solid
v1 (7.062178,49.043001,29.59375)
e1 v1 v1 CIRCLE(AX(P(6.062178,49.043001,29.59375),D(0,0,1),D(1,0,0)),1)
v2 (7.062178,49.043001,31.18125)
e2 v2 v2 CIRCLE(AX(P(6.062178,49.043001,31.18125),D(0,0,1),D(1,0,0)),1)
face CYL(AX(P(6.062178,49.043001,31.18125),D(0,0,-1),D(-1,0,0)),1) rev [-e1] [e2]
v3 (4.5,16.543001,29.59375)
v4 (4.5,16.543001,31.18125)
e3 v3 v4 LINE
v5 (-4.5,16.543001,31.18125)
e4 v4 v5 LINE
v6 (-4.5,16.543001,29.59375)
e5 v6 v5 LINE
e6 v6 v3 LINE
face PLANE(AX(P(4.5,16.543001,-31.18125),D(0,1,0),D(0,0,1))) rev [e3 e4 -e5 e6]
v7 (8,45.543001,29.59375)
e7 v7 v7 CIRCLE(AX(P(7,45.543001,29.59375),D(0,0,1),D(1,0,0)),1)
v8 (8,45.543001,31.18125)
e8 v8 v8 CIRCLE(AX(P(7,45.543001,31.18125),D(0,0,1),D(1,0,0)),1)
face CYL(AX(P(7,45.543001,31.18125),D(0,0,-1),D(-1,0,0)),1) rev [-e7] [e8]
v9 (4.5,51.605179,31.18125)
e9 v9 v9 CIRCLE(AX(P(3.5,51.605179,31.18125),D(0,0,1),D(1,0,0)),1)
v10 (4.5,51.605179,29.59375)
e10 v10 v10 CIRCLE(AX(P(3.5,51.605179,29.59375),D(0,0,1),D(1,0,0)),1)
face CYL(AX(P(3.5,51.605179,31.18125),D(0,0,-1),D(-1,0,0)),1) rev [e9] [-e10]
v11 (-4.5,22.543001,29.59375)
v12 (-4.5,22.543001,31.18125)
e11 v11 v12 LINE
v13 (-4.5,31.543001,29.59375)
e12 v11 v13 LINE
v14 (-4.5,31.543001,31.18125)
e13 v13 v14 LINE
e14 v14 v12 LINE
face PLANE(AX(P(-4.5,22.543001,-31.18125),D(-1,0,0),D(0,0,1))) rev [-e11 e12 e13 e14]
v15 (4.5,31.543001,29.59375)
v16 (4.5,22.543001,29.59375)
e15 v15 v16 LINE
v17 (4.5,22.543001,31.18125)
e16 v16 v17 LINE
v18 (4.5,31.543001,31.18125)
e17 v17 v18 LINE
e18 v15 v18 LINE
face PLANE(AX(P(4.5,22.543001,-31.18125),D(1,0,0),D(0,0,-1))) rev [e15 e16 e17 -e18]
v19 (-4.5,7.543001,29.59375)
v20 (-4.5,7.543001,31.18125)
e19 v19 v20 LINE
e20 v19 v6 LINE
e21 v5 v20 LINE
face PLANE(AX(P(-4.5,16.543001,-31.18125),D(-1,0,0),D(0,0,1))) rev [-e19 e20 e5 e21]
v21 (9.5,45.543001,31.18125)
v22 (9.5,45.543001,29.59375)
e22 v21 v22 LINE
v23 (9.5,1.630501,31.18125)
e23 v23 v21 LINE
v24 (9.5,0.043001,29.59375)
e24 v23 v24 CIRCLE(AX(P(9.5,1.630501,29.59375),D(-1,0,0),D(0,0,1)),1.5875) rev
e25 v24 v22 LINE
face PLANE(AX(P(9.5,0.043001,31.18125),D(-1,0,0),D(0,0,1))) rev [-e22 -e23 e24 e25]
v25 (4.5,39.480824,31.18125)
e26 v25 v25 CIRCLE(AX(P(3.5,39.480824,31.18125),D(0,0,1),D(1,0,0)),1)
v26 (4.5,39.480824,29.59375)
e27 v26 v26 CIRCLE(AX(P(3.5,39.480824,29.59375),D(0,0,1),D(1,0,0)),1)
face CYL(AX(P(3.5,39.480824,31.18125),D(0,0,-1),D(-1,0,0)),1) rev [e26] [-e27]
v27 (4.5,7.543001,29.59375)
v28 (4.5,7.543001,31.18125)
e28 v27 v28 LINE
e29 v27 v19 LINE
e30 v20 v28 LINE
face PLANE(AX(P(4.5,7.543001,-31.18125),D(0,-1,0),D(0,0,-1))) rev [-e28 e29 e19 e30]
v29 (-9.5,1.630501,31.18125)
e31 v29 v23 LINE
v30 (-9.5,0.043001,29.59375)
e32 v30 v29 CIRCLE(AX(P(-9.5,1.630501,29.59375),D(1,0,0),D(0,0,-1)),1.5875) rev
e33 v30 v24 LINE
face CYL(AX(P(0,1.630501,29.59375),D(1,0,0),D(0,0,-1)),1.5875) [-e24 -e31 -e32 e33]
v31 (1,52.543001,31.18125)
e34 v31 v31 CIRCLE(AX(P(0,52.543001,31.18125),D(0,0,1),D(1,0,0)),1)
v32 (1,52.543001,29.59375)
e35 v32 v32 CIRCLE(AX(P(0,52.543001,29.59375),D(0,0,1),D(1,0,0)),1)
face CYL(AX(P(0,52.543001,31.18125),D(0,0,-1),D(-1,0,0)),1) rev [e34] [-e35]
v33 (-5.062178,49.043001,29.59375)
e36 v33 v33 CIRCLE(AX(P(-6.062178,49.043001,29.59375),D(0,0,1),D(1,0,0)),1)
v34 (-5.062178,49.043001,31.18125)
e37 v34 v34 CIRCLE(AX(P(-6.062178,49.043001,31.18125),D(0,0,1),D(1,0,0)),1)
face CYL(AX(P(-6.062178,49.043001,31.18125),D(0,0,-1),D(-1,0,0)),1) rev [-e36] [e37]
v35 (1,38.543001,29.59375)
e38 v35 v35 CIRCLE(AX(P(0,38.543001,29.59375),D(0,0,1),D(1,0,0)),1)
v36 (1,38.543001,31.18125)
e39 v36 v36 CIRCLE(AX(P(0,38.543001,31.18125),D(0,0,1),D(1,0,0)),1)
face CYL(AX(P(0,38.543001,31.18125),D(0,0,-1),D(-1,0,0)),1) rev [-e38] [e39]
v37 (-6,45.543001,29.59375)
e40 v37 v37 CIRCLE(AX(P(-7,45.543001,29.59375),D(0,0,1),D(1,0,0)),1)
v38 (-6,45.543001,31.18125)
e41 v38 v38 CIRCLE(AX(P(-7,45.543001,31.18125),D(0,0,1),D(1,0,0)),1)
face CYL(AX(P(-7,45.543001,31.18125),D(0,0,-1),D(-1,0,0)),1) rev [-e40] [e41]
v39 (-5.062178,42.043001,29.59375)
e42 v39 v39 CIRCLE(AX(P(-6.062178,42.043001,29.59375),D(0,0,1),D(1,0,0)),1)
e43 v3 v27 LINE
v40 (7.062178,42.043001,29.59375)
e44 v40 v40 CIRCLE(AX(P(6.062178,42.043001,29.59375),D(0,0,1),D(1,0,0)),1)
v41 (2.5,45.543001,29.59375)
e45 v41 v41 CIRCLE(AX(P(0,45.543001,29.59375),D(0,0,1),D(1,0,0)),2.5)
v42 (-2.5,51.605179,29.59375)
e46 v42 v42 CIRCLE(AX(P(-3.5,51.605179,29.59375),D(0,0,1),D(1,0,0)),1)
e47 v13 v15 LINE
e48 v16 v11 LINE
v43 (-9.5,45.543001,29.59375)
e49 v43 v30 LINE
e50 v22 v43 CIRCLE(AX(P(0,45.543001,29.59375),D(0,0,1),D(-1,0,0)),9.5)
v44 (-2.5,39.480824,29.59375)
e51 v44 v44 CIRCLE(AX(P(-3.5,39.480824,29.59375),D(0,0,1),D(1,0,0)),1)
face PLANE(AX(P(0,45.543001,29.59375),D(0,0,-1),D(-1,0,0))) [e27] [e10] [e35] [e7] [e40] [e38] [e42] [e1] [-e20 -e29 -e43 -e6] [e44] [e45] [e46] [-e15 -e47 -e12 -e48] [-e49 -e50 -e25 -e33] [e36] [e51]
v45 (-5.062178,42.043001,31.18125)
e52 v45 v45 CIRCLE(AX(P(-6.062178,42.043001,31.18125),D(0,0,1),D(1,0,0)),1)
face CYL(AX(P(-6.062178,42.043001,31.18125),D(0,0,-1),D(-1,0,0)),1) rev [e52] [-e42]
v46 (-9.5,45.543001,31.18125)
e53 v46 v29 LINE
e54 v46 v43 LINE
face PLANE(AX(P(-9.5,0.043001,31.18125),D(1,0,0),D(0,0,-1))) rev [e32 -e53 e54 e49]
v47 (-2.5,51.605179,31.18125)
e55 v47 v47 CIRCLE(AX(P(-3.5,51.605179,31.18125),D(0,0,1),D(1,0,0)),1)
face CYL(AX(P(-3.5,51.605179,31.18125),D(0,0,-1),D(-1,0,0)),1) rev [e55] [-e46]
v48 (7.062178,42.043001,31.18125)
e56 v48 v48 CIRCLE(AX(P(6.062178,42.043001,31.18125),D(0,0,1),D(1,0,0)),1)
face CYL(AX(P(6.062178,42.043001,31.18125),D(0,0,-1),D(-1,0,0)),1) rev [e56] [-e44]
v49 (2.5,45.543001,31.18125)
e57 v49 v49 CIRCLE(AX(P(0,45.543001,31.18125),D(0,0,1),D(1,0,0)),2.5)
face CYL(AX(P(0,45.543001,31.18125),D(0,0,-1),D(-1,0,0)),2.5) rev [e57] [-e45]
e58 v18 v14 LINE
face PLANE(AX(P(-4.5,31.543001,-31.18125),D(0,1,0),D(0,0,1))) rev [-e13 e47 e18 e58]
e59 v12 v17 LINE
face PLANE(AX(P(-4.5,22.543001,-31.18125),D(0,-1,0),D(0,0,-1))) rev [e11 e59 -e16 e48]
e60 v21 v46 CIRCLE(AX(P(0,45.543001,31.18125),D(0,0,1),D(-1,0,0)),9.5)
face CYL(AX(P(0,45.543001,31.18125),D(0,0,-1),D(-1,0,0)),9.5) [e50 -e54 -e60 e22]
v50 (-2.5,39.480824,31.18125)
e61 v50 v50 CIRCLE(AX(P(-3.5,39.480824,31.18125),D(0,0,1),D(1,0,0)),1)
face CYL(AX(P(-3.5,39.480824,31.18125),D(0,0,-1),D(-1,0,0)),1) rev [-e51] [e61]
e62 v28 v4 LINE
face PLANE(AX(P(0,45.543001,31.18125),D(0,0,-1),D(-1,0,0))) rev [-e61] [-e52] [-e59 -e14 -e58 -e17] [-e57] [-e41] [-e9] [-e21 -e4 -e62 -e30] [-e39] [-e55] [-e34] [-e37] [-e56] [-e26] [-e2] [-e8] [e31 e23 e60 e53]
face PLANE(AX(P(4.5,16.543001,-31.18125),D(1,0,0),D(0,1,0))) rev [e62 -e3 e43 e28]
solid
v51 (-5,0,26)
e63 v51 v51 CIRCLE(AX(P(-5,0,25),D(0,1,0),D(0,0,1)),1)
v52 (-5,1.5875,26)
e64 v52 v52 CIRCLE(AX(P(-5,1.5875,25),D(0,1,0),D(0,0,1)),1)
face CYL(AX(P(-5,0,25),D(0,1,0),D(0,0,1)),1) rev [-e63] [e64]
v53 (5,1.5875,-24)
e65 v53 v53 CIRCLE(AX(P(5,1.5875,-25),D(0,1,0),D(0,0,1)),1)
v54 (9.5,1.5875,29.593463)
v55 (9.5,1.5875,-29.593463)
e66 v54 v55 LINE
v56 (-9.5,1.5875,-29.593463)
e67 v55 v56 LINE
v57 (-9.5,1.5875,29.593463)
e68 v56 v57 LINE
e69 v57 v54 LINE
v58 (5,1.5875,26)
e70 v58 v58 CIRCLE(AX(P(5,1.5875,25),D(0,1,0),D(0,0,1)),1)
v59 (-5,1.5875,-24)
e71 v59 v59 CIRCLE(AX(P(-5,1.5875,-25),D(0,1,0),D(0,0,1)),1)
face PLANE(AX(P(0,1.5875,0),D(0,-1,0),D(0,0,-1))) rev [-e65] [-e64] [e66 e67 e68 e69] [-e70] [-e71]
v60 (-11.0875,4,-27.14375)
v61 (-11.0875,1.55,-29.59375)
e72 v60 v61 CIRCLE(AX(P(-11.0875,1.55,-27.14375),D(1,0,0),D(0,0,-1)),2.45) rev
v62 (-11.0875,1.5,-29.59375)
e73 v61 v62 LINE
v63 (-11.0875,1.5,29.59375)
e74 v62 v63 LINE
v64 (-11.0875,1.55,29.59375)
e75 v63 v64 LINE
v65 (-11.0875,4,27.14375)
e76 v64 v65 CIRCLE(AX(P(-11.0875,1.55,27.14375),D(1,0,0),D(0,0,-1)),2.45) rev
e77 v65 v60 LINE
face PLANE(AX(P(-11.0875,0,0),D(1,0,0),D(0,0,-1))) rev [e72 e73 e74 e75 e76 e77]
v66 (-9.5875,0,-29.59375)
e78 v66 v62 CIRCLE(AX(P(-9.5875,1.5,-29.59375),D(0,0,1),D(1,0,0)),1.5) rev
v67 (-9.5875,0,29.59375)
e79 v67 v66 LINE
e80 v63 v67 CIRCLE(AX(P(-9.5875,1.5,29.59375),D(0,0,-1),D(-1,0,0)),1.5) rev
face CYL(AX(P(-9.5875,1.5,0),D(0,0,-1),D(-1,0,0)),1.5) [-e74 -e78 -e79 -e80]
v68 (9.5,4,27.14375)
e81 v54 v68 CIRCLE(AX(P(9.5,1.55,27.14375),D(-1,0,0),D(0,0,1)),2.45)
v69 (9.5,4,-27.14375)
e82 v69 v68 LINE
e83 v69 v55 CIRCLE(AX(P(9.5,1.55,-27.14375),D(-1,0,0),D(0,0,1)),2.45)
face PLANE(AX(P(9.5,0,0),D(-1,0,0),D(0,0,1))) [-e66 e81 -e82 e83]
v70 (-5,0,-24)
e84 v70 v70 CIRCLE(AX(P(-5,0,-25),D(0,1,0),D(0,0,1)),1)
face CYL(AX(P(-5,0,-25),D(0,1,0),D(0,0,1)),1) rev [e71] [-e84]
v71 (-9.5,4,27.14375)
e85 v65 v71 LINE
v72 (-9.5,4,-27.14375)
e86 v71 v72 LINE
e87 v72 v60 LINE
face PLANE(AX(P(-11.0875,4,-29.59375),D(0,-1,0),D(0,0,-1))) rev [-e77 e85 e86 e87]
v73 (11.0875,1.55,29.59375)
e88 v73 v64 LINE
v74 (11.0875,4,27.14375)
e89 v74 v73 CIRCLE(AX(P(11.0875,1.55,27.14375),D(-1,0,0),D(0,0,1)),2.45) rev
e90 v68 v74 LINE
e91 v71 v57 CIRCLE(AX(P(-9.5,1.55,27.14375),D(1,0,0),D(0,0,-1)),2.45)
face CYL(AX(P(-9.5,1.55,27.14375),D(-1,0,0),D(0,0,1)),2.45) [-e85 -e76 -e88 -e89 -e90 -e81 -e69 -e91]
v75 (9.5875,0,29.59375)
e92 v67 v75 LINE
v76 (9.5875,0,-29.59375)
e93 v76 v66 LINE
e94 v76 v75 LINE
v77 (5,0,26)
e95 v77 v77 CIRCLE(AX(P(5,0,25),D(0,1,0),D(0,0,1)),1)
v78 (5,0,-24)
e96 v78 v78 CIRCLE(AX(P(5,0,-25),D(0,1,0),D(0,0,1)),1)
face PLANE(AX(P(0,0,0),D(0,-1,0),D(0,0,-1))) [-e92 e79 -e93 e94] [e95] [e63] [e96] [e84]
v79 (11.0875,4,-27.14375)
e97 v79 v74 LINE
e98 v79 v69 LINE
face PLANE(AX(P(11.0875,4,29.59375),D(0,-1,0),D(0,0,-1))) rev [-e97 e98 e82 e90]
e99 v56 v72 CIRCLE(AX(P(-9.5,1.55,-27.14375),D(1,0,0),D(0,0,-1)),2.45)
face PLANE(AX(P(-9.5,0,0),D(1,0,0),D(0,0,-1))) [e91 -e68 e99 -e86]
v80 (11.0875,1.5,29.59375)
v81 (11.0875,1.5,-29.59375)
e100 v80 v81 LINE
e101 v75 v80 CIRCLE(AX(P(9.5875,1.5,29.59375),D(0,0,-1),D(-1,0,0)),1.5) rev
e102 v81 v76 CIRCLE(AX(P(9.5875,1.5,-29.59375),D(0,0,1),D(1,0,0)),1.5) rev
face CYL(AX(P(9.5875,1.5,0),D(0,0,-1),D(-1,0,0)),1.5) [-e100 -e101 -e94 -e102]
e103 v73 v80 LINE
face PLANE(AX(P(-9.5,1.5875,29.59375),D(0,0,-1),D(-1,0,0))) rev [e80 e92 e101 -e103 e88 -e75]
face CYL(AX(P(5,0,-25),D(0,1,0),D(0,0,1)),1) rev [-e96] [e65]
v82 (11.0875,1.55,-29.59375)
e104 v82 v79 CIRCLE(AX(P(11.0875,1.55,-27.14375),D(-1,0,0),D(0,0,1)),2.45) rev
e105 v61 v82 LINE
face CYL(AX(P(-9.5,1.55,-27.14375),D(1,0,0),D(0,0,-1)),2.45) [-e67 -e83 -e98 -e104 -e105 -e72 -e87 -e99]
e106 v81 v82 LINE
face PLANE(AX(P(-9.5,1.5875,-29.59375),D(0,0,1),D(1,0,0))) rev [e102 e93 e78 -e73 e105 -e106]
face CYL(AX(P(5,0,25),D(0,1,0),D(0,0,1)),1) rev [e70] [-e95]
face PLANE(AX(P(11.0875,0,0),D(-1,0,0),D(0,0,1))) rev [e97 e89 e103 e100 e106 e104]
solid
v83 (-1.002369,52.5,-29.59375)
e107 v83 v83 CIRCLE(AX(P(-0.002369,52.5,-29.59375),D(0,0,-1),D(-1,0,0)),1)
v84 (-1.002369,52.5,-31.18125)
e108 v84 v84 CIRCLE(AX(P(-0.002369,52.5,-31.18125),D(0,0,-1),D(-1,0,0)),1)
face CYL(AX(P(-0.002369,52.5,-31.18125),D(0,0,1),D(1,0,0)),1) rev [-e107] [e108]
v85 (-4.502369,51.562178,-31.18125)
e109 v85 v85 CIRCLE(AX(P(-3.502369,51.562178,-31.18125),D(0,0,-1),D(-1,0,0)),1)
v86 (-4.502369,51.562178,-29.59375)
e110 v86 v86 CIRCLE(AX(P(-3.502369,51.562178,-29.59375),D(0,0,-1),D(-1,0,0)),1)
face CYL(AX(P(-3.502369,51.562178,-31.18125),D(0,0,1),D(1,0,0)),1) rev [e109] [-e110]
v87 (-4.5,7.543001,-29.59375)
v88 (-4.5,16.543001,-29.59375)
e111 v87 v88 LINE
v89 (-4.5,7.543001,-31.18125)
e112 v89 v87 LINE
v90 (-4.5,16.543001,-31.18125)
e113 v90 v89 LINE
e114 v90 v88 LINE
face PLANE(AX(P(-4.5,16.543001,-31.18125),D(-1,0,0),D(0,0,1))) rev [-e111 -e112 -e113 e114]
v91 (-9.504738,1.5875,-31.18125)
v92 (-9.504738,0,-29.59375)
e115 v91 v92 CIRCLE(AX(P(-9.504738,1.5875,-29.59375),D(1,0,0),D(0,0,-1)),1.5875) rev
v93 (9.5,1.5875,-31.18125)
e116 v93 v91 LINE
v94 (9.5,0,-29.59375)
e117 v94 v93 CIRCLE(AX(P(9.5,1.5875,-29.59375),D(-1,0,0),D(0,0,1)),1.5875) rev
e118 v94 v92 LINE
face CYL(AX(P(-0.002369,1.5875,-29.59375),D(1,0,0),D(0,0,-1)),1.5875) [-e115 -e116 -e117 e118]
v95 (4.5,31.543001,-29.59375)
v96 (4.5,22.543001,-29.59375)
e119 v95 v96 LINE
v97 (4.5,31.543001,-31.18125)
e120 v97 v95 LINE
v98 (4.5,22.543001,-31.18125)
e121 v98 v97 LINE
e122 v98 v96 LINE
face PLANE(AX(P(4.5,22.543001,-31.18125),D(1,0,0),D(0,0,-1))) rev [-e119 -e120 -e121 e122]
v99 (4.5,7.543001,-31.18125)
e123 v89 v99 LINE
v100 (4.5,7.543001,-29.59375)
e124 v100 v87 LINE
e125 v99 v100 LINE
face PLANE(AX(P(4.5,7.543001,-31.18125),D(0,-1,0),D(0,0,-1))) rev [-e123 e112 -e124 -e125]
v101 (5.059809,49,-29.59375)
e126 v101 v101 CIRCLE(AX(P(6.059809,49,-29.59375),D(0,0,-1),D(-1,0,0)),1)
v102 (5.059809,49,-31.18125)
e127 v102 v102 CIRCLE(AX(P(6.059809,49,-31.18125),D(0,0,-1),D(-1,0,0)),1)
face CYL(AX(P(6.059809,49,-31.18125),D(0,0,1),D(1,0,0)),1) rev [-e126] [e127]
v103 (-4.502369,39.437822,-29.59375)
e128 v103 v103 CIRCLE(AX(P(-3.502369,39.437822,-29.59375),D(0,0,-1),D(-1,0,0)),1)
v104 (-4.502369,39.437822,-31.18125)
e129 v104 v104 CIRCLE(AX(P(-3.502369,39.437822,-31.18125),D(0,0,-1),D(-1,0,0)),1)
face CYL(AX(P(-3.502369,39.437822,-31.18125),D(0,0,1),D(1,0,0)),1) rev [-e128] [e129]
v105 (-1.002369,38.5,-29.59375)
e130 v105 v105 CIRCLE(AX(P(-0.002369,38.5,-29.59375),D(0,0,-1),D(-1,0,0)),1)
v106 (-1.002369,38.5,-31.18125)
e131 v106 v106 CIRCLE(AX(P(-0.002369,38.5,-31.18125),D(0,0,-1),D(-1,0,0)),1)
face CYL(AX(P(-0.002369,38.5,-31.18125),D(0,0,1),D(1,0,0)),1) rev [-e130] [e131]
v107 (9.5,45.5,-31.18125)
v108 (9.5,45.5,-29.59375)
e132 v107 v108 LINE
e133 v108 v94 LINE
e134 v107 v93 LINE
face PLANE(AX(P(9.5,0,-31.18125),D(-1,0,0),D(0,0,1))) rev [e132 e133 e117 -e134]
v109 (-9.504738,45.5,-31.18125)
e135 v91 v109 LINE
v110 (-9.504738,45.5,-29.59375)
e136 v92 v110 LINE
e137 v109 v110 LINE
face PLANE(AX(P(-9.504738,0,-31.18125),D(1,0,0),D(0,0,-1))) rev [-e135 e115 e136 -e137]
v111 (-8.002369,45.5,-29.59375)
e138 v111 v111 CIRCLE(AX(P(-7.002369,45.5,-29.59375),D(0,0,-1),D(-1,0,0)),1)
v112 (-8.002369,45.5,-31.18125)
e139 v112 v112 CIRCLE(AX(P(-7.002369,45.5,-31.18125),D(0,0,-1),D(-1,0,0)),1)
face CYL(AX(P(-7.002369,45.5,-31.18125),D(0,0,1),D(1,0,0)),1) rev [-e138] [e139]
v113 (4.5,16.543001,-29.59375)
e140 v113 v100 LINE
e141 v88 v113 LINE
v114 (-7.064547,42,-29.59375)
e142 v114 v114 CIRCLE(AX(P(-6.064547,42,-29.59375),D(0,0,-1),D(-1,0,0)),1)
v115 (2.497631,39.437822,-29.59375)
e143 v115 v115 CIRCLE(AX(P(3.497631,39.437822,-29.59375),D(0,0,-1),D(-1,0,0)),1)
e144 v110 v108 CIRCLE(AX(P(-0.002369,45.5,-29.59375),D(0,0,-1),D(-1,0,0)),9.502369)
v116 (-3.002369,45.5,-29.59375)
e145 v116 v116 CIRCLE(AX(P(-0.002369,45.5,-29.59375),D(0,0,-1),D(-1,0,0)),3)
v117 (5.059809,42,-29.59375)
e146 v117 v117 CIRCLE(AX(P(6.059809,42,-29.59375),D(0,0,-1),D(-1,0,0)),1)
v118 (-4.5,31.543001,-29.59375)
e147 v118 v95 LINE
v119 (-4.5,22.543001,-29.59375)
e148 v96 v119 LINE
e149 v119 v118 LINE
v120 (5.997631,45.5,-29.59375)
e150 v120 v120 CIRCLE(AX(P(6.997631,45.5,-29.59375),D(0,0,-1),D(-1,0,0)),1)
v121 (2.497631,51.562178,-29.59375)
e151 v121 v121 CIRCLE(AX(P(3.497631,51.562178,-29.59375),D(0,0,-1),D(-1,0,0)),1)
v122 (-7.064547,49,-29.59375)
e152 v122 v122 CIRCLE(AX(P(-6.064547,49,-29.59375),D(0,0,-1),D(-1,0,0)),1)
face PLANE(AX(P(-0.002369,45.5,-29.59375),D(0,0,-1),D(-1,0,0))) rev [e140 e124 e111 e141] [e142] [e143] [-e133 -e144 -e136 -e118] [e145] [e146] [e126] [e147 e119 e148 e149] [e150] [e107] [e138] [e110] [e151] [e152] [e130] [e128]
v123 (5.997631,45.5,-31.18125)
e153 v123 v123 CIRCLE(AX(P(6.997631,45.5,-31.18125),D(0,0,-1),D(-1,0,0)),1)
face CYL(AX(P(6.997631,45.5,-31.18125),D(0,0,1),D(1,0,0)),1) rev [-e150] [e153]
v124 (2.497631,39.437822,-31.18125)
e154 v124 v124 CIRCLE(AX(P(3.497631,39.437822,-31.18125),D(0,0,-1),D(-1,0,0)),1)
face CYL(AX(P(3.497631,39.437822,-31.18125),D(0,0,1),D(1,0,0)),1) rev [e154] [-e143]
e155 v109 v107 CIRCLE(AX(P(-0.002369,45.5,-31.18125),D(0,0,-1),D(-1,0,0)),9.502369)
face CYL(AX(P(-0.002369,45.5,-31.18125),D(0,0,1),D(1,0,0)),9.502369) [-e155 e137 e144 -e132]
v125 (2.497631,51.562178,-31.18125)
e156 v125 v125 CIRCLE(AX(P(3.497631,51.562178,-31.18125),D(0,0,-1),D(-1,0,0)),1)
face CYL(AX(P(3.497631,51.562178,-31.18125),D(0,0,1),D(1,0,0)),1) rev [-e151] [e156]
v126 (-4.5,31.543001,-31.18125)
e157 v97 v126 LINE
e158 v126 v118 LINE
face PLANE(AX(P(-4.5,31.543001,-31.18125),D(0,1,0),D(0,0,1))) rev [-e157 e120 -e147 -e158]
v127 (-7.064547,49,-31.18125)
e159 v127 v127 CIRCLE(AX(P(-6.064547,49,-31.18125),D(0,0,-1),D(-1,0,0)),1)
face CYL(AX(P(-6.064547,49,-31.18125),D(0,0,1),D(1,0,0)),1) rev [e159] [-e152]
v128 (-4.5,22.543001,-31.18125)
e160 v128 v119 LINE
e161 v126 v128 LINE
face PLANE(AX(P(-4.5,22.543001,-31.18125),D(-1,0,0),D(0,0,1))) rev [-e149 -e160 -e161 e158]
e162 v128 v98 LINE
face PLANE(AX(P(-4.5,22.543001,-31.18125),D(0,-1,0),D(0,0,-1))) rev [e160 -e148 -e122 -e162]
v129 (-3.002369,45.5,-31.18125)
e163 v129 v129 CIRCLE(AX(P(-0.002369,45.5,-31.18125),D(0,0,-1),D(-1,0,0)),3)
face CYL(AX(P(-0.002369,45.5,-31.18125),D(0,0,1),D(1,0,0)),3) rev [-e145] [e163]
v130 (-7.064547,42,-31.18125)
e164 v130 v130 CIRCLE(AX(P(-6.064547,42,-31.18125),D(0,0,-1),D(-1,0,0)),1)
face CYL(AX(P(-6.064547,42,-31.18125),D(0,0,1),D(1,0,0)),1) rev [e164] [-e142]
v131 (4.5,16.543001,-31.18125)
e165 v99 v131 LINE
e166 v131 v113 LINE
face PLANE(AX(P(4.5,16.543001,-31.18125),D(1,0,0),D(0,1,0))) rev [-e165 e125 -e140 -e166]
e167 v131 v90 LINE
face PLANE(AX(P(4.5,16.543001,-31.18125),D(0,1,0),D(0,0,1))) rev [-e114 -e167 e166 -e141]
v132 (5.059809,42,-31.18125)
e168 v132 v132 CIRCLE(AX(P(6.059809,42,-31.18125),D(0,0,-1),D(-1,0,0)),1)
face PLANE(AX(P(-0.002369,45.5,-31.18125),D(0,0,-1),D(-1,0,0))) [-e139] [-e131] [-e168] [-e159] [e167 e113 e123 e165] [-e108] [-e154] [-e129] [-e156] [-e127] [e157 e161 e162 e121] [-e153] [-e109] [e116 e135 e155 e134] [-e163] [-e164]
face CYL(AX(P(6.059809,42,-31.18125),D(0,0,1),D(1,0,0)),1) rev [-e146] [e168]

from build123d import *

# Parameters (mm, degrees)
ESQUISSE1_W             = 19
ESQUISSE1_H             = 59.1875
BOSS_EXTRU_1_DEPTH      = 1.5875
ESQUISSE3_W             = 59.1875
ESQUISSE3_H             = 4
BOSS_EXTRU_2_DEPTH      = 1.5875
ESQUISSE4_W             = 59.1875
ESQUISSE4_H             = 4
BOSS_EXTRU_3_DEPTH      = 1.5875
CONG_1_R                = 1.5
CONG_2_R                = 1.5
ESQUISSE5_R             = 2.5
ESQUISSE5_R_2           = 1
BOSS_EXTRU_8_DEPTH      = 1.5875
CONG_3_R                = 1.5875
ESQUISSE8_R             = 3
ESQUISSE8_R_2           = 1
BOSS_EXTRU_10_DEPTH     = 1.5875
CONG_4_R                = 1.5875
ESQUISSE9_R             = 1
ENL_V_MAT_EXTRU_1_DEPTH = 1.5875
ESQUISSE10_W            = 9
ESQUISSE10_H            = 9
ENL_V_MAT_EXTRU_2_DEPTH = 84.915112222
CONG_5_R                = 2.45
CONG_6_R                = 2.45


# Some blends are built 0.0001 mm under size
with BuildPart() as part:
    # Esquisse1 → Boss.-Extru.1 (new body)
    with BuildSketch(Plane(origin=(0, 0, 0), x_dir=(1, 0, 0), z_dir=(0, 1, 0))):
        Rectangle(ESQUISSE1_W, ESQUISSE1_H)
    extrude(amount=BOSS_EXTRU_1_DEPTH)

    # Esquisse3 → Boss.-Extru.2 (add)
    with BuildSketch(Plane(origin=(9.5, 0, 0), x_dir=(0, 0, -1), z_dir=(1, 0, 0))):
        with Locations((0, 2)):
            Rectangle(ESQUISSE3_W, ESQUISSE3_H)
    extrude(amount=BOSS_EXTRU_2_DEPTH)

    # Esquisse4 → Boss.-Extru.3 (add)
    with BuildSketch(Plane.ZY.offset(9.5)):
        with Locations((0, 2)):
            Rectangle(ESQUISSE4_W, ESQUISSE4_H)
    extrude(amount=BOSS_EXTRU_3_DEPTH)

    # Congé1
    cong_1_edges = [part.edges().sort_by_distance(p)[0] for p in [
        (11.0875, 0, 0),
    ]]
    fillet(cong_1_edges, radius=CONG_1_R)

    # Congé2
    cong_2_edges = [part.edges().sort_by_distance(p)[0] for p in [
        (-11.0875, 0, 0),
    ]]
    fillet(cong_2_edges, radius=CONG_2_R)

    # Esquisse9 → Enlèv. mat.-Extru.1 (cut)
    with BuildSketch(Plane(origin=(0, 1.5875, 0), x_dir=(1, 0, 0), z_dir=(0, 1, 0))):
        with Locations(Location((-5, 25, 0), (0, 0, 270))):
            Circle(ESQUISSE9_R)
        with Locations(Location((5, 25, 0), (0, 0, 270))):
            Circle(ESQUISSE9_R)
        with Locations(Location((-5, -25, 0), (0, 0, 270))):
            Circle(ESQUISSE9_R)
        with Locations(Location((5, -25, 0), (0, 0, 270))):
            Circle(ESQUISSE9_R)
    extrude(amount=-ENL_V_MAT_EXTRU_1_DEPTH, mode=Mode.SUBTRACT)

    # Congé5
    # the kernel refuses this fillet: 2.45 mm, written as the material it takes off along each edge
    with BuildSketch(Plane(origin=(3.375, 4, 29.59375), x_dir=(0, -1, 0), z_dir=(1, 0, 0))) as cong_5_piece_1:
        with BuildLine():
            CenterArc((CONG_5_R, CONG_5_R), CONG_5_R, 180, 90)
            Line((0, CONG_5_R), (0, 0))
            Line((0, 0), (CONG_5_R, 0))
        make_face()
    extrude(amount=13.8375, mode=Mode.SUBTRACT)
    with BuildSketch(Plane(origin=(-3.375, 4, 29.59375), x_dir=(0, -1, 0), z_dir=(-1, 0, 0))) as cong_5_piece_2:
        with BuildLine():
            CenterArc((CONG_5_R, -CONG_5_R), CONG_5_R, 90, 90)
            Line((0, -CONG_5_R), (0, 0))
            Line((0, 0), (CONG_5_R, 0))
        make_face()
    extrude(amount=13.8375, mode=Mode.SUBTRACT)

    # Congé6
    cong_6_edges = [part.edges().sort_by_distance(p)[0] for p in [
        (10.29375, 4, -29.59375),
    ]]
    fillet(cong_6_edges, radius=CONG_6_R)


with BuildPart() as body_2:
    # Esquisse5 → Boss.-Extru.8 (new body)
    with BuildSketch(Plane.XY.offset(29.59375)):
        with BuildLine():
            Line((-9.5, 0.043001341), (9.5, 0.043001341))
            Line((9.5, 0.043001341), (9.5, 45.543001341))
            ThreePointArc((9.5, 45.543001341), (0, 55.043001341), (-9.5, 45.543001341))
            Line((-9.5, 45.543001341), (-9.5, 0.043001341))
        make_face()
        with Locations((0, 45.543001341)):
            Circle(ESQUISSE5_R, mode=Mode.SUBTRACT)
        with Locations((0, 38.543001341)):
            Circle(ESQUISSE5_R_2, mode=Mode.SUBTRACT)
        with Locations((-3.5, 39.480823515)):
            Circle(ESQUISSE5_R_2, mode=Mode.SUBTRACT)
        with Locations((-6.062177826, 42.043001341)):
            Circle(ESQUISSE5_R_2, mode=Mode.SUBTRACT)
        with Locations((-7, 45.543001341)):
            Circle(ESQUISSE5_R_2, mode=Mode.SUBTRACT)
        with Locations((-6.062177826, 49.043001341)):
            Circle(ESQUISSE5_R_2, mode=Mode.SUBTRACT)
        with Locations((-3.5, 51.605179168)):
            Circle(ESQUISSE5_R_2, mode=Mode.SUBTRACT)
        with Locations((0, 52.543001341)):
            Circle(ESQUISSE5_R_2, mode=Mode.SUBTRACT)
        with Locations((3.5, 51.605179168)):
            Circle(ESQUISSE5_R_2, mode=Mode.SUBTRACT)
        with Locations((6.062177826, 49.043001341)):
            Circle(ESQUISSE5_R_2, mode=Mode.SUBTRACT)
        with Locations((7, 45.543001341)):
            Circle(ESQUISSE5_R_2, mode=Mode.SUBTRACT)
        with Locations((6.062177826, 42.043001341)):
            Circle(ESQUISSE5_R_2, mode=Mode.SUBTRACT)
        with Locations((3.5, 39.480823515)):
            Circle(ESQUISSE5_R_2, mode=Mode.SUBTRACT)
    extrude(amount=BOSS_EXTRU_8_DEPTH)

    # Congé3
    cong_3_edges = [body_2.edges().sort_by_distance(p)[0] for p in [
        (0, 0.043001341, 31.18125),
    ]]
    fillet(cong_3_edges, radius=CONG_3_R - 0.0001)  # a hair under: the kernel refuses the full size


with BuildPart() as body_3:
    # Esquisse8 → Boss.-Extru.10 (new body)
    with BuildSketch(Plane(origin=(0, 0, -29.59375), x_dir=(-1, 0, 0), z_dir=(0, 0, -1))):
        with BuildLine():
            Line((-9.5, 0), (9.504737636, 0))
            Line((9.504737636, 0), (9.504737636, 45.5))
            ThreePointArc((9.504737636, 45.5), (0.002368818, 55.002368818), (-9.5, 45.5))
            Line((-9.5, 45.5), (-9.5, 0))
        make_face()
        with Locations((0.002368818, 45.5)):
            Circle(ESQUISSE8_R, mode=Mode.SUBTRACT)
        with Locations((0.002368818, 38.5)):
            Circle(ESQUISSE8_R_2, mode=Mode.SUBTRACT)
        with Locations((-3.497631182, 39.437822174)):
            Circle(ESQUISSE8_R_2, mode=Mode.SUBTRACT)
        with Locations((-6.059809008, 42)):
            Circle(ESQUISSE8_R_2, mode=Mode.SUBTRACT)
        with Locations((-6.997631182, 45.5)):
            Circle(ESQUISSE8_R_2, mode=Mode.SUBTRACT)
        with Locations((-6.059809008, 49)):
            Circle(ESQUISSE8_R_2, mode=Mode.SUBTRACT)
        with Locations((-3.497631182, 51.562177826)):
            Circle(ESQUISSE8_R_2, mode=Mode.SUBTRACT)
        with Locations((0.002368818, 52.5)):
            Circle(ESQUISSE8_R_2, mode=Mode.SUBTRACT)
        with Locations((3.502368818, 51.562177826)):
            Circle(ESQUISSE8_R_2, mode=Mode.SUBTRACT)
        with Locations((6.064546644, 49)):
            Circle(ESQUISSE8_R_2, mode=Mode.SUBTRACT)
        with Locations((7.002368818, 45.5)):
            Circle(ESQUISSE8_R_2, mode=Mode.SUBTRACT)
        with Locations((6.064546644, 42)):
            Circle(ESQUISSE8_R_2, mode=Mode.SUBTRACT)
        with Locations((3.502368818, 39.437822174)):
            Circle(ESQUISSE8_R_2, mode=Mode.SUBTRACT)
    extrude(amount=BOSS_EXTRU_10_DEPTH)

    # Congé4
    cong_4_edges = [body_3.edges().sort_by_distance(p)[0] for p in [
        (-0.002368818, 0, -31.18125),
    ]]
    fillet(cong_4_edges, radius=CONG_4_R - 0.0001)  # a hair under: the kernel refuses the full size


with BuildPart() as enl_v_mat_extru_2_tool:
    # Esquisse10 → Enlèv. mat.-Extru.2 (new, through all)
    with BuildSketch(Plane.XY.offset(31.18125)):
        with Locations((0, 27.043001341)):
            Rectangle(ESQUISSE10_W, ESQUISSE10_H)
        with Locations((0, 12.043001341)):
            Rectangle(ESQUISSE10_W, ESQUISSE10_H)
    extrude(amount=-ENL_V_MAT_EXTRU_2_DEPTH)


with BuildPart() as body_2_1:
    add(body_2.part)

    # Enlèv. mat.-Extru.2: cut by enl_v_mat_extru_2_tool
    add(enl_v_mat_extru_2_tool.part, mode=Mode.SUBTRACT)


with BuildPart() as body_3_1:
    add(body_3.part)

    # Enlèv. mat.-Extru.2: cut by enl_v_mat_extru_2_tool
    add(enl_v_mat_extru_2_tool.part, mode=Mode.SUBTRACT)


solid = Compound([part.part, body_2_1.part, body_3_1.part])
